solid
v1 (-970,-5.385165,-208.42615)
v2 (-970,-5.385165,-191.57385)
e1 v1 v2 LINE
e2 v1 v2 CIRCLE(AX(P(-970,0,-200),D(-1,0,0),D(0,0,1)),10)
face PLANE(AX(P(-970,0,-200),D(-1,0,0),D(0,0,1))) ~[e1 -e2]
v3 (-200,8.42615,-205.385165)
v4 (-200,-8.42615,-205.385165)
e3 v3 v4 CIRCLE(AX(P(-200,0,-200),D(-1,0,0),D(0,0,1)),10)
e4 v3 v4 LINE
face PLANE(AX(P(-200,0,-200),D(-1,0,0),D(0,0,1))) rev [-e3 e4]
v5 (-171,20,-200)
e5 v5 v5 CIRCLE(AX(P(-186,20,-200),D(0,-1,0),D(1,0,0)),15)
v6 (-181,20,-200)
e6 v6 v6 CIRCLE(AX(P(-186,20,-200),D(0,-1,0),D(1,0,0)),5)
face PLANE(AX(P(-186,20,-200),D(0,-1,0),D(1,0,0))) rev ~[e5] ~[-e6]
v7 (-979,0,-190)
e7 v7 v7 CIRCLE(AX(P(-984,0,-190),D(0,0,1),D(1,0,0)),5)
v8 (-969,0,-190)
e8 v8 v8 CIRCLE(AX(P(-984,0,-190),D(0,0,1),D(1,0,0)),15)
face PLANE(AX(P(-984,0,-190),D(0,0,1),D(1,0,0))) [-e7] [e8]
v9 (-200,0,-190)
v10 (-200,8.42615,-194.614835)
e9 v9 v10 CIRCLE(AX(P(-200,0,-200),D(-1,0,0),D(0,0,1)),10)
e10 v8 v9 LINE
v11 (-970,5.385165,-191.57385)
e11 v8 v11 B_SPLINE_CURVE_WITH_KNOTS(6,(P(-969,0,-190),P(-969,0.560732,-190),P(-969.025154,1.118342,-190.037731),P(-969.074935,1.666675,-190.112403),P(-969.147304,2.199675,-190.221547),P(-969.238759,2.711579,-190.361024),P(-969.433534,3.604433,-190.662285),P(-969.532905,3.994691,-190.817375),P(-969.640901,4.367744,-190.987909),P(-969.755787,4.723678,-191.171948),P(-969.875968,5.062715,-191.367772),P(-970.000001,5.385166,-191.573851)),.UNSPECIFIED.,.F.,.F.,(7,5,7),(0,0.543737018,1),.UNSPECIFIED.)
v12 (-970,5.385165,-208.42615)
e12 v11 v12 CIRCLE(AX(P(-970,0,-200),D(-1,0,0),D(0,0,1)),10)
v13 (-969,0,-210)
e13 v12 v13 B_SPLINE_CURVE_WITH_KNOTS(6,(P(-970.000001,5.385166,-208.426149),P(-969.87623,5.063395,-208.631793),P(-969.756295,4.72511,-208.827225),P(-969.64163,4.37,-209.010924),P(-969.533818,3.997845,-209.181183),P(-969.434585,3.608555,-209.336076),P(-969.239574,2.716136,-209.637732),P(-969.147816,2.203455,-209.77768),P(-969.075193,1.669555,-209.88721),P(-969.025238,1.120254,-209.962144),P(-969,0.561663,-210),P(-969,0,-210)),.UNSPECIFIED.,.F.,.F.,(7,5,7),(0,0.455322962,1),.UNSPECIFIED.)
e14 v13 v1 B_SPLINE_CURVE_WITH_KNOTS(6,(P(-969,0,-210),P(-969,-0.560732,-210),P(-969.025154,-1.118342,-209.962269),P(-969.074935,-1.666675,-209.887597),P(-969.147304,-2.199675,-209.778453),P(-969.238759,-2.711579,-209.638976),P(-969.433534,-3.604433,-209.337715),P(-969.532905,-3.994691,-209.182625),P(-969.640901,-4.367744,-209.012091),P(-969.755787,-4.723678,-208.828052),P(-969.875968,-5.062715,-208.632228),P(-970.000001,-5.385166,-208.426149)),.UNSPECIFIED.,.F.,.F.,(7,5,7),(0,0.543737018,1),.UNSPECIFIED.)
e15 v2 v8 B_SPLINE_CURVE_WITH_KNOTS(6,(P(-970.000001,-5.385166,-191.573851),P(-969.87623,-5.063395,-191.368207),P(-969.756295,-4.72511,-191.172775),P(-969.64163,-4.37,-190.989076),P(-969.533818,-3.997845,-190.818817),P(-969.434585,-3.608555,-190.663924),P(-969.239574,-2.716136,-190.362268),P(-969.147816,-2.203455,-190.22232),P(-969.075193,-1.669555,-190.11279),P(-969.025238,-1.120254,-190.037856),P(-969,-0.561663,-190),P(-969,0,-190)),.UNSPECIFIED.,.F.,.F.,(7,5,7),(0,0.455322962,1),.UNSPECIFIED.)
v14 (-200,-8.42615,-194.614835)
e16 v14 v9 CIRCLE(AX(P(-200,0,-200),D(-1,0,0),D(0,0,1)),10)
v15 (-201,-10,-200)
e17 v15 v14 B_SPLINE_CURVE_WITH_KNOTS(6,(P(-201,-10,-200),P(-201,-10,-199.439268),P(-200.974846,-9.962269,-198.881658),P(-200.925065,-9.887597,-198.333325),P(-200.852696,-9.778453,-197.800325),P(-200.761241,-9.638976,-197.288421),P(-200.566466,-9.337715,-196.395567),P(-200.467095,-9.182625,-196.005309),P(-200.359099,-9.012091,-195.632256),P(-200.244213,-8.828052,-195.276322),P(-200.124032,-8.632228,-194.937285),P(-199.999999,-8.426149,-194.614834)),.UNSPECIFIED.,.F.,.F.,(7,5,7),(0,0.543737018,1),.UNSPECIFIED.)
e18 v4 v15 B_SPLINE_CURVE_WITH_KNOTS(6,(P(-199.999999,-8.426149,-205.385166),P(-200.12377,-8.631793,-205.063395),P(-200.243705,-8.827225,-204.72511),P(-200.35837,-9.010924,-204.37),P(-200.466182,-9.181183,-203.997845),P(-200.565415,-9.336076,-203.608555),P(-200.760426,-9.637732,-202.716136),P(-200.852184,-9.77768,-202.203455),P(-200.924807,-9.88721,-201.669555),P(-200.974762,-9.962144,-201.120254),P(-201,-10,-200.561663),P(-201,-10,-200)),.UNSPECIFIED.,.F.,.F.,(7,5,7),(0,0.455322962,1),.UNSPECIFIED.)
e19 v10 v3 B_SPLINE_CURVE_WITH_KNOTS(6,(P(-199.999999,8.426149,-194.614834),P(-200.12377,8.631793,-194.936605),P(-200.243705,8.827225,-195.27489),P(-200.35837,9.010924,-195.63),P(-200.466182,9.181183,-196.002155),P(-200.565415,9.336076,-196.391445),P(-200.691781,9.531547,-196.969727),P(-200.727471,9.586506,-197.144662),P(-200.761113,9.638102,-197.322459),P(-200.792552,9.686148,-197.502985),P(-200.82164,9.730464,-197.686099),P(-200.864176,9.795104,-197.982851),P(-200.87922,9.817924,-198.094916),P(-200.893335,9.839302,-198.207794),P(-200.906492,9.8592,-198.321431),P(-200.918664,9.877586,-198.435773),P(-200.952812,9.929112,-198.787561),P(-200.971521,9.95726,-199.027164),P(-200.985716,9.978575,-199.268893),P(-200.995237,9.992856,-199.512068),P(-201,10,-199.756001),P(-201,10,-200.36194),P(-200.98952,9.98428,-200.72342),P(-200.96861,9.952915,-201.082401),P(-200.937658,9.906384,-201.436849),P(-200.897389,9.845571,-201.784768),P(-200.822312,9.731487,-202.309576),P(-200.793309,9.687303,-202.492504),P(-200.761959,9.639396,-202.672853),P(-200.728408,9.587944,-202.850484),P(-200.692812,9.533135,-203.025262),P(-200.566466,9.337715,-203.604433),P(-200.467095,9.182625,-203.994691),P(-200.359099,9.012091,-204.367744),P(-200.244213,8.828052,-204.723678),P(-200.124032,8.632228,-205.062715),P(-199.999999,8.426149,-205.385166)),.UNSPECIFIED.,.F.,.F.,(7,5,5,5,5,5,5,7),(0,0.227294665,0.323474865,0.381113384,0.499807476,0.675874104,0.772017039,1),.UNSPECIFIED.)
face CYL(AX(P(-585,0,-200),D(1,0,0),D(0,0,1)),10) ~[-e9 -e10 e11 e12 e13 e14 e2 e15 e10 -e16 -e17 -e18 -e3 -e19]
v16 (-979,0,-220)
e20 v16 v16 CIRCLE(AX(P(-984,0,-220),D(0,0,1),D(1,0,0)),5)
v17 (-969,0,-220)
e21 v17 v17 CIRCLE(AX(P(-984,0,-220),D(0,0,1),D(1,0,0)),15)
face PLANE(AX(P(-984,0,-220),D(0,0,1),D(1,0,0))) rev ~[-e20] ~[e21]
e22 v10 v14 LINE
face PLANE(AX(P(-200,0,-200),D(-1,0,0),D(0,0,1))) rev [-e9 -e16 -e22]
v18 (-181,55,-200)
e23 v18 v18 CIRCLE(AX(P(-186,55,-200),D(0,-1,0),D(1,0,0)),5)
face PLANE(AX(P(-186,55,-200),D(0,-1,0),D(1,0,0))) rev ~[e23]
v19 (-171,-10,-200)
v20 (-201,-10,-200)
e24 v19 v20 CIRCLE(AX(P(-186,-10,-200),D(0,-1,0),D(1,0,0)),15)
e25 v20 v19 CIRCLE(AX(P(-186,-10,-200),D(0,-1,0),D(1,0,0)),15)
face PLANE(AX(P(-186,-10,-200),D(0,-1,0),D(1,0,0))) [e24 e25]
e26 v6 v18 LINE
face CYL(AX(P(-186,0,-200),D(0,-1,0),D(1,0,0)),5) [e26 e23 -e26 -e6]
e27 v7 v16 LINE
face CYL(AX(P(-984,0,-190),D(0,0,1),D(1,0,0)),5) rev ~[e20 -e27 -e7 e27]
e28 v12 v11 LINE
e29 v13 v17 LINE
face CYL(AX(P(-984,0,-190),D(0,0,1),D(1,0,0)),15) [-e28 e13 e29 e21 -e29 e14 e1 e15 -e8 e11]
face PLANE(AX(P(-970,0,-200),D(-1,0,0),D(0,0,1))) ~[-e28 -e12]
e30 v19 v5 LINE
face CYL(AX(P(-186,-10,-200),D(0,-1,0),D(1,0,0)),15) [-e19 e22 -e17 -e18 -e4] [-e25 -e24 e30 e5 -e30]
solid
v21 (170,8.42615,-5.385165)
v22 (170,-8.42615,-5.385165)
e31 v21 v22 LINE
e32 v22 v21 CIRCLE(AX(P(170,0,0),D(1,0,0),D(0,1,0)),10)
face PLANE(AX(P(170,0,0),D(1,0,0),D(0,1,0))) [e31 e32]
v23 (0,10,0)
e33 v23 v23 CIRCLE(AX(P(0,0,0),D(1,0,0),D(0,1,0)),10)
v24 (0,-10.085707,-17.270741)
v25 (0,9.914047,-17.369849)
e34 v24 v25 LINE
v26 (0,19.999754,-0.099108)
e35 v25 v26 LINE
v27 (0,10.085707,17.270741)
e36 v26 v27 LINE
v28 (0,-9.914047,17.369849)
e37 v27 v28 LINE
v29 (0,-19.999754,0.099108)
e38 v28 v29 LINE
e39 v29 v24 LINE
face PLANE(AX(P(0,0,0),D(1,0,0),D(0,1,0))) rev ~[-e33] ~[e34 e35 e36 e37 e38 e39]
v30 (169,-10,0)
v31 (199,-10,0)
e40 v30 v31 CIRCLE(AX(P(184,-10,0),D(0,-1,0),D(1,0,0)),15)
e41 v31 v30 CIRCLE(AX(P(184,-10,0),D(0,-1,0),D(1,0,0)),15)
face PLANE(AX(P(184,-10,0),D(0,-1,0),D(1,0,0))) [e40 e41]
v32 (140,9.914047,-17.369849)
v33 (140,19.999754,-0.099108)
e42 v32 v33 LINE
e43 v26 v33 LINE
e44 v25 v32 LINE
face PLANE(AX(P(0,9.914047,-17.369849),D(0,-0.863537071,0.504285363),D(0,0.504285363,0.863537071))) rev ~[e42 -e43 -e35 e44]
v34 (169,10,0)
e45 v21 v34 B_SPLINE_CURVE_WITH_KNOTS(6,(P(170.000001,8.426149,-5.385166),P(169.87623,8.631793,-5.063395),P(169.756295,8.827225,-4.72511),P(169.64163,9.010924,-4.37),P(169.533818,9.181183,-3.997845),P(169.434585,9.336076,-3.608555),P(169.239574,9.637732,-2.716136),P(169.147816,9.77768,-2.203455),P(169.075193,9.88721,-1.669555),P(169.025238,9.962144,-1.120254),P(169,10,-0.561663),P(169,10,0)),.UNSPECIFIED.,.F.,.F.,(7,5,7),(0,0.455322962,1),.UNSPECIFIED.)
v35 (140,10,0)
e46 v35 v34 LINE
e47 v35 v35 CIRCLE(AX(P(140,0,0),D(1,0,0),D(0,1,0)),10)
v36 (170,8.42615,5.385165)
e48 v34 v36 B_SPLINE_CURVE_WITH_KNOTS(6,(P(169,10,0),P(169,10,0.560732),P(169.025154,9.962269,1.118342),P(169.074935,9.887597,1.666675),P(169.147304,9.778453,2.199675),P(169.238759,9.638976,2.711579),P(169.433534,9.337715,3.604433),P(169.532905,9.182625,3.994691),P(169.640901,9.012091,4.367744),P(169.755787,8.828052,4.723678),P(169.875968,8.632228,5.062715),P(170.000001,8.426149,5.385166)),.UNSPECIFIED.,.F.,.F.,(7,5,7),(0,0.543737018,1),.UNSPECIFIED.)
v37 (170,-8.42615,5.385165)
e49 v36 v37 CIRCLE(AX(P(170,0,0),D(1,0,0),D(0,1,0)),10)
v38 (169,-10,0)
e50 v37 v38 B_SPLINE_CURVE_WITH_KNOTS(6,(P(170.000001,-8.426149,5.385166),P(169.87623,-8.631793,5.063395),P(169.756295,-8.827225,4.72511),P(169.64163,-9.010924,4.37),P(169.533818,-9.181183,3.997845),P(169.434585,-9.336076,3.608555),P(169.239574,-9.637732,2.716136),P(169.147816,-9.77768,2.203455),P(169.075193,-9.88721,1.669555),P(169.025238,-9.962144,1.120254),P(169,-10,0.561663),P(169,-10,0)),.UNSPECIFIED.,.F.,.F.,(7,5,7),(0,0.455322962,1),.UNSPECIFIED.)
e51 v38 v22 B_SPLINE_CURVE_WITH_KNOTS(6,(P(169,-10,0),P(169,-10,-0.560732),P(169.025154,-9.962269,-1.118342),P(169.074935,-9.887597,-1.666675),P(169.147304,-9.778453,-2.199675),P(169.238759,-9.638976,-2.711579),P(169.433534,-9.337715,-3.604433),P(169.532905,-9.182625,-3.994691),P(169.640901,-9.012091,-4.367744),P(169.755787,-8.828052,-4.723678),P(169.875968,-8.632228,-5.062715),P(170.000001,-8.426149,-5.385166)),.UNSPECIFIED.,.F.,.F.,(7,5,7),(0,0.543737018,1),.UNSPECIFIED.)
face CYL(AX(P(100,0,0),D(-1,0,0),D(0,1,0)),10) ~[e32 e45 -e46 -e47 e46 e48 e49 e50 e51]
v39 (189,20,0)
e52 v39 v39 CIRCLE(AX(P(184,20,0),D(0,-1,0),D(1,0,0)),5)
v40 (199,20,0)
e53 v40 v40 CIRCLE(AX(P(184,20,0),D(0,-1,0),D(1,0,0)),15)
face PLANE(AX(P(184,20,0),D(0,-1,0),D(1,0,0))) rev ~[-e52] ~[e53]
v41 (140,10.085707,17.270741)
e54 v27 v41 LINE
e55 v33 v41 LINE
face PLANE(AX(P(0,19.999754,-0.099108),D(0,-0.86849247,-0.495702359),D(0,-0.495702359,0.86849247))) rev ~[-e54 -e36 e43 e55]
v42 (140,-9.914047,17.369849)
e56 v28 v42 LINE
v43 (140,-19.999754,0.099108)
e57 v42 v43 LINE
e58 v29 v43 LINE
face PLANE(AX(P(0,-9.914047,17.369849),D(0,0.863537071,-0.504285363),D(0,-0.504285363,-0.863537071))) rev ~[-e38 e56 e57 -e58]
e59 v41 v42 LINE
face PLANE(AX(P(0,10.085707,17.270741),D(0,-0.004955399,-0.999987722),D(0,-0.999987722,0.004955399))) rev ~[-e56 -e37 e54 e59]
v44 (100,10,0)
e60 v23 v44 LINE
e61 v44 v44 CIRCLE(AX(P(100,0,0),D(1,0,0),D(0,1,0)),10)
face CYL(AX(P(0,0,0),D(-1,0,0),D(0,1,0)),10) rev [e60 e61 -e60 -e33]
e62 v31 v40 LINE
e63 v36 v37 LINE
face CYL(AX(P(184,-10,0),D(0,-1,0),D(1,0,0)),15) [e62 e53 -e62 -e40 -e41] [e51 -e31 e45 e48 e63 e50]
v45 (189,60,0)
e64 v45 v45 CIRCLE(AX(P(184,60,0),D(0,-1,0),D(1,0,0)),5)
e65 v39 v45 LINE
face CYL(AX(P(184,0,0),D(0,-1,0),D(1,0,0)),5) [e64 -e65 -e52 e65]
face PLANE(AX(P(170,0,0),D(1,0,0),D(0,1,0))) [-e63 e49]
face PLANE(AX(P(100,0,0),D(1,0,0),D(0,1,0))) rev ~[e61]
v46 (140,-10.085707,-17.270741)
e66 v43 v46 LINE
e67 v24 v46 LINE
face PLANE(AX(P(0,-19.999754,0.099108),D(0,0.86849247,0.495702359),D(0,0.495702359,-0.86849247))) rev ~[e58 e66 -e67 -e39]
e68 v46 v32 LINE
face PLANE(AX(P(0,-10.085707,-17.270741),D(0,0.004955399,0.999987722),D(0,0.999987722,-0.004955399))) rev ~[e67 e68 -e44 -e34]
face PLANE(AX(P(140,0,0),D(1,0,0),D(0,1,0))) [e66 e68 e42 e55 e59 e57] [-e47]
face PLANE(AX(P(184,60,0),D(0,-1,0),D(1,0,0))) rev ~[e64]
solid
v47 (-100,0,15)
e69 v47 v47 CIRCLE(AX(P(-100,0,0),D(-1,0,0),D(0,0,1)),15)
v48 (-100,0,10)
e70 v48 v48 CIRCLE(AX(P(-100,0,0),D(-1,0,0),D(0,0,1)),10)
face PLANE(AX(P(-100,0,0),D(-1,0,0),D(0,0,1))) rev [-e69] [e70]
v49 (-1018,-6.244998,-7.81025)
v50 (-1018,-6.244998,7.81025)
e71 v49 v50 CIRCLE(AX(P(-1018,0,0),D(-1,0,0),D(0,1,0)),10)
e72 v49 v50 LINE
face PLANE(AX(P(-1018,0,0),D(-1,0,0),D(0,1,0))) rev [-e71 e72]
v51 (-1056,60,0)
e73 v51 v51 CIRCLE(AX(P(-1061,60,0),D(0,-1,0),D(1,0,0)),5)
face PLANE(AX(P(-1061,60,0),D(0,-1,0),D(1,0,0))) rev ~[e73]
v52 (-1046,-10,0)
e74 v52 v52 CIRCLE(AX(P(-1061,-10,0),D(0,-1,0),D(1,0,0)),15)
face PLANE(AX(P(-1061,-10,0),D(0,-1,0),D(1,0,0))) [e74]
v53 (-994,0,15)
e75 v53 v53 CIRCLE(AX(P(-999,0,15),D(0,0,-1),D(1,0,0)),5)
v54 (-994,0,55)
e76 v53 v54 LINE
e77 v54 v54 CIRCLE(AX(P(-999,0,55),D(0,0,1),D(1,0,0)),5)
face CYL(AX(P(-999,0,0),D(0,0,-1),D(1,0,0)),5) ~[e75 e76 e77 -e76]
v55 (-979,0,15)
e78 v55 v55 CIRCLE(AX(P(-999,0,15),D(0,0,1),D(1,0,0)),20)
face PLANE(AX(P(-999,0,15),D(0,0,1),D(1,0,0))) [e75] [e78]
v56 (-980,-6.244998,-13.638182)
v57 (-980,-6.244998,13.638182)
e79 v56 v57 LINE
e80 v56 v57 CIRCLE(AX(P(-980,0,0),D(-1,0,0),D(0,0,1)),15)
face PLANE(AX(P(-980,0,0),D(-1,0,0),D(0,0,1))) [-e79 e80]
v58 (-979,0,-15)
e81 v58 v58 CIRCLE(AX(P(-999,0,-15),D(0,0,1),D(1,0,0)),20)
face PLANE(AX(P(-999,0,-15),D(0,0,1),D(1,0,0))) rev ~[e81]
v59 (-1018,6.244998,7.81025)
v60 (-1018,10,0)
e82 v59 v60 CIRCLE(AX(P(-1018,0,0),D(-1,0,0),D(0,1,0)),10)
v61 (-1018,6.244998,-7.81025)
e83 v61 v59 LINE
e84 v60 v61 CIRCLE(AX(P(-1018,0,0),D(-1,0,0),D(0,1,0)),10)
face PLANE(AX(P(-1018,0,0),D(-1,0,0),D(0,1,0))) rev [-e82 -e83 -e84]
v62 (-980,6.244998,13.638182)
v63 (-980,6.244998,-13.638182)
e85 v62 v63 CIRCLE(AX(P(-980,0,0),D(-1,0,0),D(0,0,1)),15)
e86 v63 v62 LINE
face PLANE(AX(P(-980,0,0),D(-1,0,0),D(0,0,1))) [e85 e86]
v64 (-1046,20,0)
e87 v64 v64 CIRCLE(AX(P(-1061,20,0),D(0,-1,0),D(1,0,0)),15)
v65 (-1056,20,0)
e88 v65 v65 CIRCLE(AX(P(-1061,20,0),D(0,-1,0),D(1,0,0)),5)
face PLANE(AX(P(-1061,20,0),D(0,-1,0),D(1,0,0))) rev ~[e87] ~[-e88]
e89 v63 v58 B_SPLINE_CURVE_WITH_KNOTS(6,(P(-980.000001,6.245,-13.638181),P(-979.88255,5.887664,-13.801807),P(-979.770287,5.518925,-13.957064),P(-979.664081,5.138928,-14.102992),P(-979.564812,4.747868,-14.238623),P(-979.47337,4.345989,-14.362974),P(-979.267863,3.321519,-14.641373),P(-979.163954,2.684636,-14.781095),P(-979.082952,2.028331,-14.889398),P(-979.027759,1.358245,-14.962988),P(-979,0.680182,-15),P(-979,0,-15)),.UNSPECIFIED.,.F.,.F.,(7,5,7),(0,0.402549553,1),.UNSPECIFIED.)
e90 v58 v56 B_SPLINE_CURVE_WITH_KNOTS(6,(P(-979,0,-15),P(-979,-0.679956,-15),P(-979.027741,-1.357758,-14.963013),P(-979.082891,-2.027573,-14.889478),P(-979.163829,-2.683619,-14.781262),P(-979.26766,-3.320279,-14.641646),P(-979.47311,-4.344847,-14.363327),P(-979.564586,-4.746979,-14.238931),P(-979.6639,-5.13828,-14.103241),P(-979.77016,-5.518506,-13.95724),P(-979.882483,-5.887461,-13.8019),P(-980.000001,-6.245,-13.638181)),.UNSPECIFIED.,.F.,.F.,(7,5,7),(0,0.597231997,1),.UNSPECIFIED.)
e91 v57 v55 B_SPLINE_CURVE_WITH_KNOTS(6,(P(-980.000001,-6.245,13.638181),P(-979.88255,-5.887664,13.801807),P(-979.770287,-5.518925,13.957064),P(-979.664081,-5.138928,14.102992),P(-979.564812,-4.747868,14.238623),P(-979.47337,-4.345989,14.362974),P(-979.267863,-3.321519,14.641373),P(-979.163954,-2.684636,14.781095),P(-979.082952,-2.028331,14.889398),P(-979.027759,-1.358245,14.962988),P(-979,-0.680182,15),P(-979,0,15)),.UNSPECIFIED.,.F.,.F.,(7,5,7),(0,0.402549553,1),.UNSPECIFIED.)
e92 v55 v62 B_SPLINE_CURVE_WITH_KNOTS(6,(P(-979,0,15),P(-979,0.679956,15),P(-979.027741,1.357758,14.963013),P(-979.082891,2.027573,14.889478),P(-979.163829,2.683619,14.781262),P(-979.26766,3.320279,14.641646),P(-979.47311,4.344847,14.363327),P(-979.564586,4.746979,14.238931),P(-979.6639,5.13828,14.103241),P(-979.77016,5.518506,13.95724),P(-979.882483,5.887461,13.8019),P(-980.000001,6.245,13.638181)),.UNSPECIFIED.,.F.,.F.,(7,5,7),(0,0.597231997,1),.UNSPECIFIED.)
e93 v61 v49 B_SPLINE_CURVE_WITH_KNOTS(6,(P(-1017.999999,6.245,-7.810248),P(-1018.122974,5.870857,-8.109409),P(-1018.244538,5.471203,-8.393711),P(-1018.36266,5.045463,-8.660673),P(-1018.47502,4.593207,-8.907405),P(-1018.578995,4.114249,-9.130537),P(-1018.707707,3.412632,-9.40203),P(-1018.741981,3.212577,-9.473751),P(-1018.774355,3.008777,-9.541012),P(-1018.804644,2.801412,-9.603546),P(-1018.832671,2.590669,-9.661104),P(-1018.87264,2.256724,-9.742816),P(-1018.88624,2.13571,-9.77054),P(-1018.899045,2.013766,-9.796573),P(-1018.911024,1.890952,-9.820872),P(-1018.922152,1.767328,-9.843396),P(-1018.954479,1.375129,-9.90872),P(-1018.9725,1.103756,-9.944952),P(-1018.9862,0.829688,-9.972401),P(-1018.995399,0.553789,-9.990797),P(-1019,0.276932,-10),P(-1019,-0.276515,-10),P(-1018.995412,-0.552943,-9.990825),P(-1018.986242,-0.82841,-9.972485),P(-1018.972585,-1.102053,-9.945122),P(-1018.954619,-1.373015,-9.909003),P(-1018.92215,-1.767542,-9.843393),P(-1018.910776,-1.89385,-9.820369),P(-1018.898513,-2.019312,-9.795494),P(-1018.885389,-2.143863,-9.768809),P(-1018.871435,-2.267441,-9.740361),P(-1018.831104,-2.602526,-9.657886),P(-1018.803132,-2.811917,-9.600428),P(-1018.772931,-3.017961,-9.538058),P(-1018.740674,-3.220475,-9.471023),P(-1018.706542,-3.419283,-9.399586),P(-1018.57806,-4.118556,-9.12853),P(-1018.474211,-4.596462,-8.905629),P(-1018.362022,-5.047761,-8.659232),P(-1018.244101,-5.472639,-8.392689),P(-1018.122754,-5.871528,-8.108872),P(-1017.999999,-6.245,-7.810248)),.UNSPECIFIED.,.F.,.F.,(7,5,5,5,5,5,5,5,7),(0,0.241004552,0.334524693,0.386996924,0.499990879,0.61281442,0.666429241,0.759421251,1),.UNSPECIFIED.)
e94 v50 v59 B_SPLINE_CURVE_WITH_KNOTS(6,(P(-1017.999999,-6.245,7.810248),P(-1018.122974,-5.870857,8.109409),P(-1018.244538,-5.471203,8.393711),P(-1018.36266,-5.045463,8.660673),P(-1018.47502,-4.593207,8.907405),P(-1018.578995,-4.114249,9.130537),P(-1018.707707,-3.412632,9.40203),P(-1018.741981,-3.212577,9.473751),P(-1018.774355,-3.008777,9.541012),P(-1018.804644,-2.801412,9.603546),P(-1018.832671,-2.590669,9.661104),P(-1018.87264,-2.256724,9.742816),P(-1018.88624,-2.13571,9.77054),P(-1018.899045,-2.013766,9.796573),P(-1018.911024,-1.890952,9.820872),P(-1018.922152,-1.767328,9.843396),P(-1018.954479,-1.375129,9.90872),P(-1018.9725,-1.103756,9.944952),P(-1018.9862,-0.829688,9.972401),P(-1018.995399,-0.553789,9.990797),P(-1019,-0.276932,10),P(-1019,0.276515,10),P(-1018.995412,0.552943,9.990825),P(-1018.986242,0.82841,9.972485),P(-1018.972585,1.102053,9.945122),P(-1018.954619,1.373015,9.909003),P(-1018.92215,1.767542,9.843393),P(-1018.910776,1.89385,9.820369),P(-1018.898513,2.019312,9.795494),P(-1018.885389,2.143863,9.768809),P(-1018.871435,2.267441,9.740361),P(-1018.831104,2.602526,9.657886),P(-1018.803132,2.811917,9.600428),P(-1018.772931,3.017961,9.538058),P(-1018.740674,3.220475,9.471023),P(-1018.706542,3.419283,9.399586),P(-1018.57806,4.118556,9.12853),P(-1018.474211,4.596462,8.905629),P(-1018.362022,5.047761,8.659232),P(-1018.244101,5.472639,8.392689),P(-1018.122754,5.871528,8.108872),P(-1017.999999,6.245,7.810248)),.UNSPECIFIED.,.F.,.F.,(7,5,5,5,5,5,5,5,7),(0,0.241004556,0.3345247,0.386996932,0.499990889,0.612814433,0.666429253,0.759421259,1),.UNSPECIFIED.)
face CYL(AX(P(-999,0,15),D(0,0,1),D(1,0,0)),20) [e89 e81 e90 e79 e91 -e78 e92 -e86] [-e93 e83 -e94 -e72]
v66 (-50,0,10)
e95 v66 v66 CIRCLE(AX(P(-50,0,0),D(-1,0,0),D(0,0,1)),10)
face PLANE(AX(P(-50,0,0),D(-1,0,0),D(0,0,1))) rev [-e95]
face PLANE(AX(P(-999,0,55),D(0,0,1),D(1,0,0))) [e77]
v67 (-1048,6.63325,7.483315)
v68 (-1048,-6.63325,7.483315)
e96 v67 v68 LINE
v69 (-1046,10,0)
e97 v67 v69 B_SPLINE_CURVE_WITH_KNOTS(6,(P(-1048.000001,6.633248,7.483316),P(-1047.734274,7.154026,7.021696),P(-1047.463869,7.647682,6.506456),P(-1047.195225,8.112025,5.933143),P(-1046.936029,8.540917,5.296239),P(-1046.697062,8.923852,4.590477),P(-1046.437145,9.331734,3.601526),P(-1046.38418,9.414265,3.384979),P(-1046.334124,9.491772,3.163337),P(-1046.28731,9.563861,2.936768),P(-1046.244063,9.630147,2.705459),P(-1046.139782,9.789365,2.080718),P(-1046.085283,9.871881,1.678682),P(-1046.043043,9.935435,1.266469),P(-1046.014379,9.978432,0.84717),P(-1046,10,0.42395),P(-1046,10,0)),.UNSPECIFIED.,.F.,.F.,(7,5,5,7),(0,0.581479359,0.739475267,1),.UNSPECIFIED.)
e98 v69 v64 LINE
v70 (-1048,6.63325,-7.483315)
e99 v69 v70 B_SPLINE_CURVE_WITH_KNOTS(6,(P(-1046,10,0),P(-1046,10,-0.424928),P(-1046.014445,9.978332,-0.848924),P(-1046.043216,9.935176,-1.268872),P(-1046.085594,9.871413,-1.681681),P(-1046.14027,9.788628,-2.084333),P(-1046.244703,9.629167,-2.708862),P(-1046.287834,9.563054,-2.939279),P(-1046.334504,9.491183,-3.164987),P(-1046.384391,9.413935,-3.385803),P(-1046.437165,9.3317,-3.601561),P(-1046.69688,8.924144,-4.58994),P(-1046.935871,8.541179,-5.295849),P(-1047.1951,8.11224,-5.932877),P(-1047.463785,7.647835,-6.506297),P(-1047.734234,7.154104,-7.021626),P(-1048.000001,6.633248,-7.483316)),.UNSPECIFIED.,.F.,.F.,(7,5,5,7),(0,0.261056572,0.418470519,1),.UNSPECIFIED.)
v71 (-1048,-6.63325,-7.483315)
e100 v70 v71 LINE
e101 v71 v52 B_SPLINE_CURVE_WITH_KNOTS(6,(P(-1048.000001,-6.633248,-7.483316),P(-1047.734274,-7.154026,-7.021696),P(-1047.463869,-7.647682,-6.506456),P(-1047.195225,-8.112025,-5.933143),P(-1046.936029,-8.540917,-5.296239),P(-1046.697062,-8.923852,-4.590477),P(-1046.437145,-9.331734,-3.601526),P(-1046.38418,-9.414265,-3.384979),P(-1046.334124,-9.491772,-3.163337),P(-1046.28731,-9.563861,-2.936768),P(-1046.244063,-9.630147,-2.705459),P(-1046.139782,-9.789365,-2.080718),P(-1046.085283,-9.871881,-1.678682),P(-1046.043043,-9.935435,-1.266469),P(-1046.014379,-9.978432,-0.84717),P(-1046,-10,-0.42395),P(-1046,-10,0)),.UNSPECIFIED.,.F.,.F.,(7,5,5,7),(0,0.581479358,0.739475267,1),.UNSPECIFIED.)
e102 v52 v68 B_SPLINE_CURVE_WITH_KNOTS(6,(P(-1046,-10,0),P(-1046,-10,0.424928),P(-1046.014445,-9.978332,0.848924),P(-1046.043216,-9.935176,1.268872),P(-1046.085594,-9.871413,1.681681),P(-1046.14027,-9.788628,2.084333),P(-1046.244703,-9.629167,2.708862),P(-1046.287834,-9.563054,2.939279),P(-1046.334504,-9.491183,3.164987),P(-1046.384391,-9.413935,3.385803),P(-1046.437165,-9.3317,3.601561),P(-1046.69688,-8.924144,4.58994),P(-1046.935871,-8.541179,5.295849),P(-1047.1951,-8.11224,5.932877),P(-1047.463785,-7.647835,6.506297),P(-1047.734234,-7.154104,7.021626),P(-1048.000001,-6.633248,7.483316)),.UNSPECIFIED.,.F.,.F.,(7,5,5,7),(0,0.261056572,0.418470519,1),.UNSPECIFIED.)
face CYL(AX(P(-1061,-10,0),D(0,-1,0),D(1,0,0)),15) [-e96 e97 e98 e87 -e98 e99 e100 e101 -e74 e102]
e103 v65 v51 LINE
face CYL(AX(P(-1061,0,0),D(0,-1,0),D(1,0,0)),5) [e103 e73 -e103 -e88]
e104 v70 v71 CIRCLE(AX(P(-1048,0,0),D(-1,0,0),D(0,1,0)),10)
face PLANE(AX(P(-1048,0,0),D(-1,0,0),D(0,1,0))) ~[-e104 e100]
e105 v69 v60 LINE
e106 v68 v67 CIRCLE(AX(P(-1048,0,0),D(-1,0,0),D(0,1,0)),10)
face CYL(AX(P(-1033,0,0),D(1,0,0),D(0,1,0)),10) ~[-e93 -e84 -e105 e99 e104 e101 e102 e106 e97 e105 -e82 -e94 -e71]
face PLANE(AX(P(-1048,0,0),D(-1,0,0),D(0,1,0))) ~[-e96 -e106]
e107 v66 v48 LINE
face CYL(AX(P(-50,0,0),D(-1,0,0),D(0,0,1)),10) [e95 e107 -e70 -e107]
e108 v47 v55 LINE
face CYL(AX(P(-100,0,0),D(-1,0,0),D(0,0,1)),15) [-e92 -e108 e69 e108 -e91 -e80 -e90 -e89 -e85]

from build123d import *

# Parameters (mm, degrees)
F0_R      = 10
F1_DEPTH  = 140
F3_R      = 10
F4_DEPTH  = 70
F7_DEPTH  = 30
F9_DEPTH  = 60
F13_R     = 20
F14_DEPTH = 30
F15_R     = 5
F16_DEPTH = 55
F17_W     = 30
F17_H     = 10
F19_R     = 15
F20_DEPTH = 30
F21_R     = 5
F22_DEPTH = 60
F23_W     = 770
F23_H     = 10
F25_R     = 15
F26_DEPTH = 30
F27_R     = 5
F28_DEPTH = 55
F30_R     = 15
F30_R_2   = 5
F31_DEPTH = 30


with BuildPart() as f1:
    # F0 (on Right) → F1 (new body)
    with BuildSketch(Plane.YZ):
        Polygon((19.9997544387, -0.0991079843), (10.0857072515, 17.2707414212), (-9.9140471872, 17.3698494055), (-19.9997544387, 0.0991079843), (-10.0857072515, -17.2707414212), (9.9140471872, -17.3698494055), align=None)
        Circle(F0_R, mode=Mode.SUBTRACT)
    extrude(amount=F1_DEPTH)

    # F3 (on offset) → F4 (join)
    with BuildSketch(Plane.YZ.offset(100)):
        Circle(F3_R)
    extrude(amount=F4_DEPTH)

    # F6 (on offset) → F7 (join)
    with BuildSketch(Plane.XZ.offset(10)):
        with BuildLine():
            ThreePointArc((169, 0), (184, -15), (199, 0))
            ThreePointArc((199, 0), (184, 15), (169, 0))
        make_face()
    extrude(amount=-F7_DEPTH)

    # F8 (on Front) → F9 (join)
    with BuildSketch(Plane.XZ):
        with BuildLine():
            ThreePointArc((179, 0), (184, -5), (189, 0))
            ThreePointArc((189, 0), (184, 5), (179, 0))
        make_face()
    extrude(amount=-F9_DEPTH)


with BuildPart() as f11:
    # F10 (on Front) → F11 (revolve)
    with BuildSketch(Plane.XZ):
        Polygon((-980, 0), (-50, 0), (-50, 10), (-100, 10), (-100, 15), (-980, 15), align=None)
    revolve(axis=Axis((-515, 0, 0), (-1, 0, 0)))

    # F13 (on offset) → F14 (join)
    with BuildSketch(Plane.XY.offset(15)):
        with Locations((-999, 0)):
            Circle(F13_R)
    extrude(amount=-F14_DEPTH)

    # F15 (on Top) → F16 (join)
    with BuildSketch(Plane.XY):
        with Locations((-999, 0)):
            Circle(F15_R)
    extrude(amount=F16_DEPTH)

    # F17 (on Top) → F18 (revolve)
    with BuildSketch(Plane.XY):
        with Locations((-1033, 5)):
            Rectangle(F17_W, F17_H)
    revolve(axis=Axis((-1033, 0, 0), (-1, 0, 0)))

    # F19 (on offset) → F20 (join)
    with BuildSketch(Plane.XZ.offset(10)):
        with Locations((-1061, 0)):
            Circle(F19_R)
    extrude(amount=-F20_DEPTH)

    # F21 (on Front) → F22 (join)
    with BuildSketch(Plane.XZ):
        with Locations((-1061, 0)):
            Circle(F21_R)
    extrude(amount=-F22_DEPTH)


with BuildPart() as f24:
    # F23 (on Front) → F24 (revolve)
    with BuildSketch(Plane.XZ):
        with Locations((-585, -195)):
            Rectangle(F23_W, F23_H)
    revolve(axis=Axis((-585, 0, -200), (-1, 0, 0)))

    # F25 (on offset) → F26 (join)
    with BuildSketch(Plane.XZ.offset(10)):
        with Locations((-186, -200)):
            Circle(F25_R)
    extrude(amount=-F26_DEPTH)

    # F27 (on Front) → F28 (join)
    with BuildSketch(Plane.XZ):
        with Locations((-186, -200)):
            Circle(F27_R)
    extrude(amount=-F28_DEPTH)

    # F30 (on offset) → F31 (join)
    with BuildSketch(Plane.XY.offset(-190)):
        with Locations((-984, 0)):
            Circle(F30_R)
        with Locations((-984, 0)):
            Circle(F30_R_2, mode=Mode.SUBTRACT)
    extrude(amount=-F31_DEPTH)


solid = Compound([f1.part, f11.part, f24.part])
